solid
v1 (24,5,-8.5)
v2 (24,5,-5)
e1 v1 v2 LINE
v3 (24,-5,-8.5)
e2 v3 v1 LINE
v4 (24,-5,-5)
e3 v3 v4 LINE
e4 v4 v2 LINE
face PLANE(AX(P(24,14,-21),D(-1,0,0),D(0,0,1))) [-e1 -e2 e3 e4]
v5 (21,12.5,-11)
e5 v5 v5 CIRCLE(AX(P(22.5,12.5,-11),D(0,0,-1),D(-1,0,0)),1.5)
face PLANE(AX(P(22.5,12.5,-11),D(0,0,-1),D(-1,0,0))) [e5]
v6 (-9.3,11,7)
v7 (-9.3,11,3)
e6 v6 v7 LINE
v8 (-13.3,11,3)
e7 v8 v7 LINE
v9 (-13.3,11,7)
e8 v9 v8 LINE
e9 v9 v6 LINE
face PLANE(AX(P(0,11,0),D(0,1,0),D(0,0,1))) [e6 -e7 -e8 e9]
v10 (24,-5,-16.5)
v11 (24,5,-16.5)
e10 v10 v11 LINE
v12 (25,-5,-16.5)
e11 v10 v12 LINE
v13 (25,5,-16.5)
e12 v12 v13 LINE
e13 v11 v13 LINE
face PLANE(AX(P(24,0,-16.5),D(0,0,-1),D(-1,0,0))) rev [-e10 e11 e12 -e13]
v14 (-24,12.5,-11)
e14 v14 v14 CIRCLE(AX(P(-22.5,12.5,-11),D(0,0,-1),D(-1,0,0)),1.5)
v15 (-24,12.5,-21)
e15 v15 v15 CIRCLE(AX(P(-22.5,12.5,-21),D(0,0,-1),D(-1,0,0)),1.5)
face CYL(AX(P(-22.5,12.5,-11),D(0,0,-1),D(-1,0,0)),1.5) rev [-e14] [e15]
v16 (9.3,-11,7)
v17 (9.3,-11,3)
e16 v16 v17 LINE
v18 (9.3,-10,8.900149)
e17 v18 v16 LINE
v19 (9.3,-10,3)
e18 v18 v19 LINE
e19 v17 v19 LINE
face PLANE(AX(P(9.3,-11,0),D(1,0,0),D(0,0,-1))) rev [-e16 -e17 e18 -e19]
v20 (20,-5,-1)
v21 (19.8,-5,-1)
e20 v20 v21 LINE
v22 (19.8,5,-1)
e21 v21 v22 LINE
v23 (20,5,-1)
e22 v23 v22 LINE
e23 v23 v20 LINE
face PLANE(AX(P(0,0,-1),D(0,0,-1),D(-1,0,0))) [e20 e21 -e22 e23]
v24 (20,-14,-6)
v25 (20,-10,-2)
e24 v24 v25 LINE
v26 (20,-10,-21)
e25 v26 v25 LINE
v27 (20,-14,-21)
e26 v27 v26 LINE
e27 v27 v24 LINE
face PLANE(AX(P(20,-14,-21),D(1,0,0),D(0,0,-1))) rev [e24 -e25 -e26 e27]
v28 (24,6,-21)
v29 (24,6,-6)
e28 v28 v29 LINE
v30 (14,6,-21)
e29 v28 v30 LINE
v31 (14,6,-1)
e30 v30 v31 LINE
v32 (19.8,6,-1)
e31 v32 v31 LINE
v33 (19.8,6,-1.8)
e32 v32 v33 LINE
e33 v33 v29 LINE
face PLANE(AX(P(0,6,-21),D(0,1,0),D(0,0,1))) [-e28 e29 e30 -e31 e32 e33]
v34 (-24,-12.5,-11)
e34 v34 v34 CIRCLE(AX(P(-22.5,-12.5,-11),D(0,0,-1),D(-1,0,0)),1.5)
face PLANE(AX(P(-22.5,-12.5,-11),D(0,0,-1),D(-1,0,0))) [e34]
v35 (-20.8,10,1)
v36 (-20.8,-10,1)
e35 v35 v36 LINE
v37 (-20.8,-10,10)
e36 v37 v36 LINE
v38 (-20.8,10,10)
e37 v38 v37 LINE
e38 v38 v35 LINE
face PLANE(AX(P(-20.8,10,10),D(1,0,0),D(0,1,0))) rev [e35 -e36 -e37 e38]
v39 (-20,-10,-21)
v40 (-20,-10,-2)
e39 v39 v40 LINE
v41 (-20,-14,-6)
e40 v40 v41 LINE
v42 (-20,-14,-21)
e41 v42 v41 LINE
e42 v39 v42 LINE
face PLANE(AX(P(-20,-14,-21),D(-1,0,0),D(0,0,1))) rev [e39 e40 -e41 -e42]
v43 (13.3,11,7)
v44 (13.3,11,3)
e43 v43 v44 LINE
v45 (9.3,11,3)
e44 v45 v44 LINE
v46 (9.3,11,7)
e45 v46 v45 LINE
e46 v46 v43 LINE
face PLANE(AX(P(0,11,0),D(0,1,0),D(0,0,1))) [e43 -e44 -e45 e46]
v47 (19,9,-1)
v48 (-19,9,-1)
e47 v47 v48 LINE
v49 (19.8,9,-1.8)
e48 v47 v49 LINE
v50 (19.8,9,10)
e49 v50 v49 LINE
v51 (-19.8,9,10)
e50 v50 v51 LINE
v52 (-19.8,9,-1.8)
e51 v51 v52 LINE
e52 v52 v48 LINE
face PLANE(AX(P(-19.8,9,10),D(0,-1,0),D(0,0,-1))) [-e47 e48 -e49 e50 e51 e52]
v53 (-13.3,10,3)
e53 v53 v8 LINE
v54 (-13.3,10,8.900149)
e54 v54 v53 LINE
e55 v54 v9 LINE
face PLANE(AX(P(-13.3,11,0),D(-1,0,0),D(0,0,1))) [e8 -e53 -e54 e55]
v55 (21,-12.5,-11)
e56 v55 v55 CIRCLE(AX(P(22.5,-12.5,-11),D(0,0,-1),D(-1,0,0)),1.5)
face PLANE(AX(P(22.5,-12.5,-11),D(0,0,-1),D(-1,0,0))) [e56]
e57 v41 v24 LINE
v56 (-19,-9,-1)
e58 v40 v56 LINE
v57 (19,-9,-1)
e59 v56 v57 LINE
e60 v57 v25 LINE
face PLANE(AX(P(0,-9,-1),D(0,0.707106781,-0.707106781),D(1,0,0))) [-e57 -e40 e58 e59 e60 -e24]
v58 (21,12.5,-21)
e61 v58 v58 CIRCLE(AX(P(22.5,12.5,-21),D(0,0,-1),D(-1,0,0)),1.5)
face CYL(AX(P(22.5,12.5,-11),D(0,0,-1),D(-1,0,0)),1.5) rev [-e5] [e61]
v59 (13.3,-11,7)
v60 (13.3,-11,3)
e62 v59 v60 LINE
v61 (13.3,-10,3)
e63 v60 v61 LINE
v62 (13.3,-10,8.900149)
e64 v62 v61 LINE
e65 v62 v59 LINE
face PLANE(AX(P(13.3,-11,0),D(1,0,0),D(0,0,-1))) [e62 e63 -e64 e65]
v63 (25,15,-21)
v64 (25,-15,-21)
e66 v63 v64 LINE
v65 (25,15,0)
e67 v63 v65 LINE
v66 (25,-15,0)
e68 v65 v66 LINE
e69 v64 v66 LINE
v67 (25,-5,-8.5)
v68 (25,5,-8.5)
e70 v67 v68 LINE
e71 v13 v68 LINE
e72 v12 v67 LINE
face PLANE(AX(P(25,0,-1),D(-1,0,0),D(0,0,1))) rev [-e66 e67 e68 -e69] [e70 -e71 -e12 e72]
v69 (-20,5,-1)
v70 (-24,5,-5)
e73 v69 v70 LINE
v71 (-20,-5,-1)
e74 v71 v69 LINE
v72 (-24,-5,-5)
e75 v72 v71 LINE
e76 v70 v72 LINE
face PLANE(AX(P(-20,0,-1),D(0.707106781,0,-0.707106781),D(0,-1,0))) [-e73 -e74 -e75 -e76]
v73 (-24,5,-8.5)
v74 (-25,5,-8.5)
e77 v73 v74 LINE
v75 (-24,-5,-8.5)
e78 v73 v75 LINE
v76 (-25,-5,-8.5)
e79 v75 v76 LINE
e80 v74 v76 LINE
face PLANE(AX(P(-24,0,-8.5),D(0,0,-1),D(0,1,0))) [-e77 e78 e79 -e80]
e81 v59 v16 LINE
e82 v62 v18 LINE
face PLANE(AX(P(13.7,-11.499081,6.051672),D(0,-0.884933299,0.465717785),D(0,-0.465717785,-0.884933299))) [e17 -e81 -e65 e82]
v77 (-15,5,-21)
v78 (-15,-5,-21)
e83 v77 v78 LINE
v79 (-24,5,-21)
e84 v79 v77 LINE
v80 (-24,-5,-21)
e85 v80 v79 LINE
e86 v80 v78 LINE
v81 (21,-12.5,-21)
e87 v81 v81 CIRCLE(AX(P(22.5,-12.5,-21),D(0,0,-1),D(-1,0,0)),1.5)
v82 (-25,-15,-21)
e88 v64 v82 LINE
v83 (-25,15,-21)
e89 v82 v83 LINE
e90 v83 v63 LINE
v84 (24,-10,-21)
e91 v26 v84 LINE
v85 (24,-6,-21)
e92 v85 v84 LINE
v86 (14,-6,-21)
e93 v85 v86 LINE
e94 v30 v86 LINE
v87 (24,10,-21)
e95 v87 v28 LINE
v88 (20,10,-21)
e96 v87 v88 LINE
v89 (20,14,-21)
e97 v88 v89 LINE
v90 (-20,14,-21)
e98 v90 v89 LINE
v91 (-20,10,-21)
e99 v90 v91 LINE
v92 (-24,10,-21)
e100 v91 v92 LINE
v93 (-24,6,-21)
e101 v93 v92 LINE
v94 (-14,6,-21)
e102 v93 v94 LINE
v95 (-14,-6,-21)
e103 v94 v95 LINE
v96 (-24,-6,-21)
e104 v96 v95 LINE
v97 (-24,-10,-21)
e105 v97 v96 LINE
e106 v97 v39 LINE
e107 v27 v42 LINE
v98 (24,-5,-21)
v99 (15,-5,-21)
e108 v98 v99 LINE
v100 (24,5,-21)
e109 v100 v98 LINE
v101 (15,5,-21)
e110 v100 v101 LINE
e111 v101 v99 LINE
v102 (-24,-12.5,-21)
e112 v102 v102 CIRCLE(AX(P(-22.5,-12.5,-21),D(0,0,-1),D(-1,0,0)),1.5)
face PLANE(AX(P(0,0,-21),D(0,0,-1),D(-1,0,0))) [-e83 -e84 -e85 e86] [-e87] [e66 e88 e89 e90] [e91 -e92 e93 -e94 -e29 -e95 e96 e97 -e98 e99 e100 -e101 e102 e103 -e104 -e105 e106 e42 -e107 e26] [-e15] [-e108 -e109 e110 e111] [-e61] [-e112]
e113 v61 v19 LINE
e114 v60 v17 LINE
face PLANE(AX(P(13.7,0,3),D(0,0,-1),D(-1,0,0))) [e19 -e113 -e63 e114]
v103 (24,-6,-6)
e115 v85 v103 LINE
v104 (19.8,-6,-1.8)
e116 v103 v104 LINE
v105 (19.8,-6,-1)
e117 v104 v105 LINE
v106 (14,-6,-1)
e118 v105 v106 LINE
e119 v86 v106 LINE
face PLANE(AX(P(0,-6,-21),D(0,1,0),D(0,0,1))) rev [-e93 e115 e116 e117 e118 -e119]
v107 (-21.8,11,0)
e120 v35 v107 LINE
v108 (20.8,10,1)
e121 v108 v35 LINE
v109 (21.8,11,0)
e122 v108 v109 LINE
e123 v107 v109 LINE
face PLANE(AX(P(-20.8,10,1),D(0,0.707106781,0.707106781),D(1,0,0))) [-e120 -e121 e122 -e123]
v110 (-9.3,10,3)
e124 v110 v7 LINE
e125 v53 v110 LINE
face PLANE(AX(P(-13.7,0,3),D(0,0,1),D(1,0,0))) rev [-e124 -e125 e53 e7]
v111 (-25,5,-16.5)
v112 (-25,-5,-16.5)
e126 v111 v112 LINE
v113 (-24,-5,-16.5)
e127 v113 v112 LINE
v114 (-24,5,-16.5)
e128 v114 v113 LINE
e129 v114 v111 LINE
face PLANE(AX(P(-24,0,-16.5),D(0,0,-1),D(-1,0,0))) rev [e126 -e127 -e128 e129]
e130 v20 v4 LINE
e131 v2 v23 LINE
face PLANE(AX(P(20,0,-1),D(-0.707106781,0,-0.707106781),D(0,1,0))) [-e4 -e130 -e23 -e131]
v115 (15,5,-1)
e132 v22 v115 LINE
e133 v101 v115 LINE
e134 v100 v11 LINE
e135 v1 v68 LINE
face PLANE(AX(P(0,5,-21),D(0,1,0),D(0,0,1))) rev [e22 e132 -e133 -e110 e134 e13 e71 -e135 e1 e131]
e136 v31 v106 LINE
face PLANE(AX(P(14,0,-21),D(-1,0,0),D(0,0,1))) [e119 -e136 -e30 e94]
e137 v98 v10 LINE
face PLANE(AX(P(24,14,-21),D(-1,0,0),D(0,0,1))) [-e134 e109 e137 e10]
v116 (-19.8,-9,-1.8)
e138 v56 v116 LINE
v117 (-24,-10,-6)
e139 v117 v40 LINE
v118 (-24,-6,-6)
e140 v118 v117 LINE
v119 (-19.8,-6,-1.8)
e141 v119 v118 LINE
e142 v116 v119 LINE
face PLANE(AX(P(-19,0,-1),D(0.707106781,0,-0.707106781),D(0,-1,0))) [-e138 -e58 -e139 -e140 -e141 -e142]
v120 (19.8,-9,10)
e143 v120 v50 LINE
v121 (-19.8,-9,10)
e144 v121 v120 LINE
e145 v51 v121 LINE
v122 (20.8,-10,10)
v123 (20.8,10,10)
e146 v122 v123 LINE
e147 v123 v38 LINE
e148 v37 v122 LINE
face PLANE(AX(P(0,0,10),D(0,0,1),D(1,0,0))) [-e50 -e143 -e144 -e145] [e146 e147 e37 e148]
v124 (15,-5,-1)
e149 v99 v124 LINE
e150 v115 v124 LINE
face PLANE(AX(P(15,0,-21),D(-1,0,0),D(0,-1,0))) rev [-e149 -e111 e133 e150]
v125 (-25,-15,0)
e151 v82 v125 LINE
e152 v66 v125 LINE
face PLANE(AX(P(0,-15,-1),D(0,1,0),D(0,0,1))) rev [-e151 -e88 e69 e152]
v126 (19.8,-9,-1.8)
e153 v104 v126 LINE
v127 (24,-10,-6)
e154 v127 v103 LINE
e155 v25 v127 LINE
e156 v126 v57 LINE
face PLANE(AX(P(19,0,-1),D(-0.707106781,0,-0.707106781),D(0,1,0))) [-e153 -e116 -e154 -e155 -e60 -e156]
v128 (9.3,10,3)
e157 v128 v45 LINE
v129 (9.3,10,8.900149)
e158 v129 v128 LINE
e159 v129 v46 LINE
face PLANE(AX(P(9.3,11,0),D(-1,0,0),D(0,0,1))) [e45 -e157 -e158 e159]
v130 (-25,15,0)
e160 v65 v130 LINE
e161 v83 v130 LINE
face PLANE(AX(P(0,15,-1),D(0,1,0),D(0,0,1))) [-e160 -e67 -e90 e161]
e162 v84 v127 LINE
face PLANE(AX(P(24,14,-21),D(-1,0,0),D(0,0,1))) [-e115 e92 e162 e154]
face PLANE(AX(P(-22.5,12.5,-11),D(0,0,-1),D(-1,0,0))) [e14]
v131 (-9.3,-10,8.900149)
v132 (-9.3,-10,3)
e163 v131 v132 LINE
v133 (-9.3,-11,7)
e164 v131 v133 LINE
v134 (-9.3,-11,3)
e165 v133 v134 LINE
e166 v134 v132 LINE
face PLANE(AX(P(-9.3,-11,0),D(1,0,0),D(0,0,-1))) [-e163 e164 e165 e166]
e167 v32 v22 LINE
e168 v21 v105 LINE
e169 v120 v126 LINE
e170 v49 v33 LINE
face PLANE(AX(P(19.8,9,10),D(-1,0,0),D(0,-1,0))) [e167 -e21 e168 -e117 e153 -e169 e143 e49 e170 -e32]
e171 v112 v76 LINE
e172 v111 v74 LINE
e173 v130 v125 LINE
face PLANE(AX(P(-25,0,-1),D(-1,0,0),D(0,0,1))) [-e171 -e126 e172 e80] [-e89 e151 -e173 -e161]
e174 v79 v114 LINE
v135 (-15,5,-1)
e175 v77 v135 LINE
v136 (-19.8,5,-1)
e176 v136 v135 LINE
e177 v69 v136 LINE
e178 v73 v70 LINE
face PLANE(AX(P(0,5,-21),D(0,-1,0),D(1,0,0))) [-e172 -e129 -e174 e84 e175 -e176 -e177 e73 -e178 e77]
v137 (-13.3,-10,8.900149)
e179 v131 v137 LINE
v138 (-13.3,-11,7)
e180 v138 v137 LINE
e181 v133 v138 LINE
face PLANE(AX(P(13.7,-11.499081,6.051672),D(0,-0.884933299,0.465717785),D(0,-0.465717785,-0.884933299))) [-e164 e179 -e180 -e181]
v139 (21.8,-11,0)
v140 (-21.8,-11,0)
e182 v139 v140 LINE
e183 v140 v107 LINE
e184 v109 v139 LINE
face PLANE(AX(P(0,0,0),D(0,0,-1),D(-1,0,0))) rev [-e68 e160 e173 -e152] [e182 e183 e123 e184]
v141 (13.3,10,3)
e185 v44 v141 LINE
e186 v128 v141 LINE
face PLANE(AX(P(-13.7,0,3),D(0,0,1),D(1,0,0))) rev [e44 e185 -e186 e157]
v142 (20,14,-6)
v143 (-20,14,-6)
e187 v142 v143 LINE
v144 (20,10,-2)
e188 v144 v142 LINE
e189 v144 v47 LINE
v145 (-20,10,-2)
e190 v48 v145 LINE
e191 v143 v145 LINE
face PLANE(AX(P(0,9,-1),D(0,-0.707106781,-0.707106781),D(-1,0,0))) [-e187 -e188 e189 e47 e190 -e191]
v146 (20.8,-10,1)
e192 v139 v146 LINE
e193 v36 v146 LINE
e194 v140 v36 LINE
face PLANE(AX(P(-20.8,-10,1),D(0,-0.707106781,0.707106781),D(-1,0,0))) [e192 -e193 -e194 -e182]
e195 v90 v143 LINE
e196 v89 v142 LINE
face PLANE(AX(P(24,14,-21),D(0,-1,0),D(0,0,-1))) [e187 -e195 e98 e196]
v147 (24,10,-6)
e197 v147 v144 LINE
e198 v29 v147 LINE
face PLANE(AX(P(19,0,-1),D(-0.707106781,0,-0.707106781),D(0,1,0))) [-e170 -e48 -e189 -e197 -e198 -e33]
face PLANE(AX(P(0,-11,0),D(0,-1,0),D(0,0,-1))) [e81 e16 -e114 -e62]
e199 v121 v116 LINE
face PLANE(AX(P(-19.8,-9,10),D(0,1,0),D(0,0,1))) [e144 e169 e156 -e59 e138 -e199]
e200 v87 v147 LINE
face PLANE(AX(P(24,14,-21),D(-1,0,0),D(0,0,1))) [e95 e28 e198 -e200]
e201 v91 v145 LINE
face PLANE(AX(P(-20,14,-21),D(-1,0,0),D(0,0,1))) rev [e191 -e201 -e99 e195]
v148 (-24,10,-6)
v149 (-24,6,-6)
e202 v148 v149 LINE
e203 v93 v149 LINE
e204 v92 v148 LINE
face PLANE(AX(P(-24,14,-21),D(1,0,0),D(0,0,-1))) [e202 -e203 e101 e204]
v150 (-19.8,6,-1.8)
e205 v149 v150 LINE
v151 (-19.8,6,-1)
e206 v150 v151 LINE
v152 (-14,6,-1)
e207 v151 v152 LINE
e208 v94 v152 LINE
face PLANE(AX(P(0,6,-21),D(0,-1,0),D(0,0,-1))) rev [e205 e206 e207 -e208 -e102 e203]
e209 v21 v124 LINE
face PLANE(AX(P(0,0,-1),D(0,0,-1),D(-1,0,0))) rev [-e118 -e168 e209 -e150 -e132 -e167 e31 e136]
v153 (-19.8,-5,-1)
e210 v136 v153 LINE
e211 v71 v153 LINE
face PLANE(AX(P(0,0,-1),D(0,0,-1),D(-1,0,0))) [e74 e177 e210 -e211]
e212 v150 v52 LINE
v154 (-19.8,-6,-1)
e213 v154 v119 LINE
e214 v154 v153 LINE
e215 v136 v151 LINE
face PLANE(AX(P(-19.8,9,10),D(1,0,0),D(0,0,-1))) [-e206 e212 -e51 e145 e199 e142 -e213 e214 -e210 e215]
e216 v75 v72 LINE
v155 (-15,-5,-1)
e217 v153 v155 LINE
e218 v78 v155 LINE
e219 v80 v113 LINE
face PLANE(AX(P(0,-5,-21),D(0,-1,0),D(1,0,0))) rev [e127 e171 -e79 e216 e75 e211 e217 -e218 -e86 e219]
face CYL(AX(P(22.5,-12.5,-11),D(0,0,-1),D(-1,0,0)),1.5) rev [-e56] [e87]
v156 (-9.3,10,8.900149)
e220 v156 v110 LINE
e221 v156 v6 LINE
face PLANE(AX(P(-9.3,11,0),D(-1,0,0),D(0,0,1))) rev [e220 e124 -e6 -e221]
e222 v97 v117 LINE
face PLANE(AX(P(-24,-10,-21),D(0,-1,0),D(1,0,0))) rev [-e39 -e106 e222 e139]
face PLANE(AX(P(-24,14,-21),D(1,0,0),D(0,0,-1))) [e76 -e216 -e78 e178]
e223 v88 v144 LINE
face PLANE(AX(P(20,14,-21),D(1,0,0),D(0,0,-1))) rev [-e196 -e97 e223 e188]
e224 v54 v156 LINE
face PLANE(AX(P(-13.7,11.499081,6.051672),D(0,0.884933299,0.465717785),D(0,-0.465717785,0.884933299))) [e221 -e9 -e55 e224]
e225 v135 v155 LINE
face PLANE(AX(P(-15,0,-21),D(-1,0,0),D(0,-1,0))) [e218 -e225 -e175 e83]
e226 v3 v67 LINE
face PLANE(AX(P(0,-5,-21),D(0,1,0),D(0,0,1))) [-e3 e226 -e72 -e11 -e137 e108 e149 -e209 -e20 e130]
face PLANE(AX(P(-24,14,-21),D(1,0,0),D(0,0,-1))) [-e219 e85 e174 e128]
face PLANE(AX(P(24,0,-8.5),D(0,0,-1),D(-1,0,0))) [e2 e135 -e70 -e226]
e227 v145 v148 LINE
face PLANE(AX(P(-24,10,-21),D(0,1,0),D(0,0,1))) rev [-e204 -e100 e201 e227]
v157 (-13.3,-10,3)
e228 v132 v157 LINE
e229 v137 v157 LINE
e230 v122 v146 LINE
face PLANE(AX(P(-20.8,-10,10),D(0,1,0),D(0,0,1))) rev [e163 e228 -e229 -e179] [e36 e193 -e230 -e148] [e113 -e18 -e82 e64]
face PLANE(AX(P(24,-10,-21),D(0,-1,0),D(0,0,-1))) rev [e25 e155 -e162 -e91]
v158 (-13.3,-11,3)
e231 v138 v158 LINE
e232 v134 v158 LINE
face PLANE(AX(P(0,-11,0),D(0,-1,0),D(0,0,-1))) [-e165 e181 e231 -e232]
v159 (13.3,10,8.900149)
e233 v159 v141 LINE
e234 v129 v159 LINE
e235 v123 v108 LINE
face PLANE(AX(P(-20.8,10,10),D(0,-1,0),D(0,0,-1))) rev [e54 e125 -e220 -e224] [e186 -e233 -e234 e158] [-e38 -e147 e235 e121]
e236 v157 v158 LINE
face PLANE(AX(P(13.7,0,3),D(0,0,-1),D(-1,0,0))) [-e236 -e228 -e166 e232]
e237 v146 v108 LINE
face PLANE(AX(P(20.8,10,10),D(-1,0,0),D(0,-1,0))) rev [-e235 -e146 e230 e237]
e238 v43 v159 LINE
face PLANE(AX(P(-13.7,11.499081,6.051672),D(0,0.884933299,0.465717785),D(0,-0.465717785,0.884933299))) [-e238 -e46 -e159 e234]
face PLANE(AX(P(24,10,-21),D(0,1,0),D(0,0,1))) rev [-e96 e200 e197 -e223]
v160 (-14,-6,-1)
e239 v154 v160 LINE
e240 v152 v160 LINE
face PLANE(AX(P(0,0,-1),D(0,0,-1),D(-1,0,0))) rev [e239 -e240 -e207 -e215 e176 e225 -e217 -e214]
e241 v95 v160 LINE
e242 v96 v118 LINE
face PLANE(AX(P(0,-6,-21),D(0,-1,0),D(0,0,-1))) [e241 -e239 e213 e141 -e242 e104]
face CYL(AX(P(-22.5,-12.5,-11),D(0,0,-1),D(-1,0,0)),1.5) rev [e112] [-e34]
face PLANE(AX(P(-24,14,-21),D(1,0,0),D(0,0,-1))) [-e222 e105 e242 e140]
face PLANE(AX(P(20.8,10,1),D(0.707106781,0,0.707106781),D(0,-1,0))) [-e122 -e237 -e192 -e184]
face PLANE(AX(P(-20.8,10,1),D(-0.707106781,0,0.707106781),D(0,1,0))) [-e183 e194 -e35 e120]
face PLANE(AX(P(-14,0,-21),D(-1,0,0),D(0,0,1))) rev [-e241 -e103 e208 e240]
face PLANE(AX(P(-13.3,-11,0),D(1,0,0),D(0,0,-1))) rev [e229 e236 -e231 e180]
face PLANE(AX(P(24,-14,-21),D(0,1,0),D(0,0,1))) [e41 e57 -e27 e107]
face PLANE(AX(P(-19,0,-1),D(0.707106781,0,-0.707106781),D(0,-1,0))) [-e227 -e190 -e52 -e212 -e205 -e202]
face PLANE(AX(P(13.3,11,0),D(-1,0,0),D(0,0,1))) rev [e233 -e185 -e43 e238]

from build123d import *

# Parameters (mm, degrees)
SKETCH1_W            = 41.6
SKETCH1_H            = 20
SKETCH1_W_2          = 39.6
SKETCH1_H_2          = 18
BOSS_EXTRUDE2_DEPTH  = 10
SKETCH2_W            = 4
SKETCH2_H            = 10
BOSS_EXTRUDE3_DEPTH  = 1
SKETCH3_W            = 3
SKETCH3_H            = 1
CUT_EXTRUDE1_DEPTH   = 27
SKETCH4_W            = 4
SKETCH4_H            = 10
BOSS_EXTRUDE4_DEPTH  = 1
SKETCH5_W            = 3
SKETCH5_H            = 1
CUT_EXTRUDE2_DEPTH   = 27
SKETCH6_W            = 50
SKETCH6_H            = 30
SKETCH6_W_2          = 41.6
SKETCH6_H_2          = 20
SKETCH6_W_3          = 39.6
SKETCH6_H_3          = 18
BOSS_EXTRUDE6_DEPTH  = 1
CHAMFER1_SIZE        = 1
SKETCH7_W            = 50
SKETCH7_H            = 30
SKETCH7_W_2          = 48
SKETCH7_H_2          = 28
BOSS_EXTRUDE7_DEPTH  = 20
SKETCH8_W            = 4.2
SKETCH8_H            = 1
BOSS_EXTRUDE8_DEPTH  = 20
SKETCH9_W            = 4.2
SKETCH9_H            = 1
BOSS_EXTRUDE9_DEPTH  = 20
SKETCH10_W           = 4
SKETCH10_H           = 4
BOSS_EXTRUDE10_DEPTH = 20
SKETCH11_W           = 2
SKETCH11_H           = 10
CUT_EXTRUDE3_DEPTH   = 1
SKETCH12_W           = 2
SKETCH12_H           = 10
CUT_EXTRUDE4_DEPTH   = 1
SKETCH13_R           = 1.5
CUT_EXTRUDE5_DEPTH   = 10
CHAMFER2_SIZE        = 5
CHAMFER3_SIZE        = 5
CHAMFER4_SIZE        = 4


# Some blends are built 0.0001 mm under size
with BuildPart() as part:
    # Sketch1 → Boss-Extrude2 (new body)
    with BuildSketch(Plane.XY):
        Rectangle(SKETCH1_W, SKETCH1_H)
        Rectangle(SKETCH1_W_2, SKETCH1_H_2, mode=Mode.SUBTRACT)
    extrude(amount=BOSS_EXTRUDE2_DEPTH)

    # Sketch2 → Boss-Extrude3 (add)
    with BuildSketch(Plane.XZ.offset(10)):
        with Locations((-11.3, 5)):
            Rectangle(SKETCH2_W, SKETCH2_H)
        with Locations((11.3, 5)):
            Rectangle(SKETCH2_W, SKETCH2_H)
    extrude(amount=BOSS_EXTRUDE3_DEPTH)

    # Sketch3 → Cut-Extrude1 (cut)
    with BuildSketch(Plane.ZY.offset(13.3)):
        Polygon((8.900149248, -10), (7, -11), (10, -11), (10, -10), align=None)
        with Locations((1.5, -10.5)):
            Rectangle(SKETCH3_W, SKETCH3_H)
    extrude(amount=-CUT_EXTRUDE1_DEPTH, mode=Mode.SUBTRACT)

    # Sketch4 → Boss-Extrude4 (add)
    with BuildSketch(Plane(origin=(0, 10, 0), x_dir=(1, 0, 0), z_dir=(0, 1, 0))):
        with Locations((11.3, -5)):
            Rectangle(SKETCH4_W, SKETCH4_H)
        with Locations((-11.3, -5)):
            Rectangle(SKETCH4_W, SKETCH4_H)
    extrude(amount=BOSS_EXTRUDE4_DEPTH)

    # Sketch5 → Cut-Extrude2 (cut)
    with BuildSketch(Plane(origin=(13.3, 0, 0), x_dir=(0, 0, -1), z_dir=(1, 0, 0))):
        Polygon((-7, 11), (-10, 11), (-10, 10), (-8.900149248, 10), align=None)
        with Locations((-1.5, 10.5)):
            Rectangle(SKETCH5_W, SKETCH5_H)
    extrude(amount=-CUT_EXTRUDE2_DEPTH, mode=Mode.SUBTRACT)

    # Sketch6 → Boss-Extrude6 (add)
    # profile 1 of 2: a face of its own
    with BuildSketch(Plane(origin=(0, 0, 0), x_dir=(-1, 0, 0), z_dir=(0, 0, -1))):
        Rectangle(SKETCH6_W, SKETCH6_H)
        Rectangle(SKETCH6_W_2, SKETCH6_H_2, mode=Mode.SUBTRACT)
    # profile 2 of 2: a face of its own
    with BuildSketch(Plane(origin=(0, 0, 0), x_dir=(-1, 0, 0), z_dir=(0, 0, -1))):
        Rectangle(SKETCH6_W_2, SKETCH6_H_2)
        Rectangle(SKETCH6_W_3, SKETCH6_H_3, mode=Mode.SUBTRACT)
    extrude(amount=BOSS_EXTRUDE6_DEPTH)

    # Chamfer1
    chamfer1_edges = [part.edges().sort_by_distance(p)[0] for p in [
        (0, -10, 0),
        (-20.8, 0, 0),
        (0, 10, 0),
        (20.8, 0, 0),
    ]]
    chamfer(chamfer1_edges, length=CHAMFER1_SIZE)

    # Sketch7 → Boss-Extrude7 (add)
    with BuildSketch(Plane(origin=(0, 0, -1), x_dir=(-1, 0, 0), z_dir=(0, 0, -1))):
        Rectangle(SKETCH7_W, SKETCH7_H)
        Rectangle(SKETCH7_W_2, SKETCH7_H_2, mode=Mode.SUBTRACT)
    extrude(amount=BOSS_EXTRUDE7_DEPTH)

    # Sketch8 → Boss-Extrude8 (add)
    with BuildSketch(Plane(origin=(0, 0, -1), x_dir=(-1, 0, 0), z_dir=(0, 0, -1))):
        Polygon((-15, -5), (-19.8, -5), (-19.8, -6), (-14, -6), (-14, 6), (-19.8, 6), (-19.8, 5), (-15, 5), align=None)
        with Locations((-21.9, 5.5)):
            Rectangle(SKETCH8_W, SKETCH8_H)
        with Locations((-21.9, -5.5)):
            Rectangle(SKETCH8_W, SKETCH8_H)
    extrude(amount=BOSS_EXTRUDE8_DEPTH)

    # Sketch9 → Boss-Extrude9 (add)
    with BuildSketch(Plane(origin=(0, 0, -1), x_dir=(-1, 0, 0), z_dir=(0, 0, -1))):
        Polygon((15, 5), (19.8, 5), (19.8, 6), (14, 6), (14, -6), (19.8, -6), (19.8, -5), (15, -5), align=None)
        with Locations((21.9, 5.5)):
            Rectangle(SKETCH9_W, SKETCH9_H)
        with Locations((21.9, -5.5)):
            Rectangle(SKETCH9_W, SKETCH9_H)
    extrude(amount=BOSS_EXTRUDE9_DEPTH)

    # Sketch10 → Boss-Extrude10 (add)
    with BuildSketch(Plane(origin=(0, 0, -1), x_dir=(-1, 0, 0), z_dir=(0, 0, -1))):
        with Locations((-22, 12)):
            Rectangle(SKETCH10_W, SKETCH10_H)
        with Locations((22, 12)):
            Rectangle(SKETCH10_W, SKETCH10_H)
        with Locations((22, -12)):
            Rectangle(SKETCH10_W, SKETCH10_H)
        with Locations((-22, -12)):
            Rectangle(SKETCH10_W, SKETCH10_H)
    extrude(amount=BOSS_EXTRUDE10_DEPTH)

    # Sketch11 → Cut-Extrude3 (cut)
    with BuildSketch(Plane.ZY.offset(25)):
        Polygon((-10.5, -5), (-10.5, 5), (-16.5, 5), (-16.5, 0), (-16.5, -5), align=None)
        with Locations((-9.5, 0)):
            Rectangle(SKETCH11_W, SKETCH11_H)
    extrude(amount=-CUT_EXTRUDE3_DEPTH, mode=Mode.SUBTRACT)

    # Sketch12 → Cut-Extrude4 (cut)
    with BuildSketch(Plane(origin=(25, 0, 0), x_dir=(0, 0, -1), z_dir=(1, 0, 0))):
        with Locations((9.5, 0)):
            Rectangle(SKETCH12_W, SKETCH12_H)
        Polygon((16.5, 5), (10.5, 5), (10.5, -5), (16.5, -5), (16.5, 0), align=None)
    extrude(amount=-CUT_EXTRUDE4_DEPTH, mode=Mode.SUBTRACT)

    # Sketch13 → Cut-Extrude5 (cut)
    with BuildSketch(Plane(origin=(0, 0, -21), x_dir=(-1, 0, 0), z_dir=(0, 0, -1))):
        with Locations((-22.5, 12.5)):
            Circle(SKETCH13_R)
        with Locations((22.5, 12.5)):
            Circle(SKETCH13_R)
        with Locations((22.5, -12.5)):
            Circle(SKETCH13_R)
        with Locations((-22.5, -12.5)):
            Circle(SKETCH13_R)
    extrude(amount=-CUT_EXTRUDE5_DEPTH, mode=Mode.SUBTRACT)

    # Chamfer2
    chamfer2_edges = [part.edges().sort_by_distance(p)[0] for p in [
        (0, 14, -1),
        (0, -14, -1),
    ]]
    chamfer(chamfer2_edges, length=CHAMFER2_SIZE - 0.0001)  # a hair under: the kernel refuses the full size

    # Chamfer3
    # the kernel refuses this chamfer: 5 mm, written as the material it adds along each edge
    with BuildSketch(Plane(origin=(24, -21.85851494, -1), x_dir=(-0.9996219169112968, 0, 0.02749587661058636), z_dir=(0, 1, 0))) as chamfer3_piece_1_section:
        Polygon((CHAMFER3_SIZE * 0.999621916911, -CHAMFER3_SIZE * 0.0274958766106), (-CHAMFER3_SIZE * 0.0274958766106, -CHAMFER3_SIZE * 0.999621916911), (0, 0), align=None)
    chamfer3_piece_1 = extrude(amount=28.71692988, mode=Mode.PRIVATE)
    chamfer3_piece_1 = split(chamfer3_piece_1, bisect_by=Plane(origin=(19.8, -10.000025, -1.99995), z_dir=(1, 0, 0)), keep=Keep.TOP, mode=Mode.PRIVATE)
    chamfer3_piece_1 = split(chamfer3_piece_1, bisect_by=Plane(origin=(19.999975, -5, -1.99995), z_dir=(0, -1, 0)), keep=Keep.TOP, mode=Mode.PRIVATE)
    chamfer3_piece_1 = split(chamfer3_piece_1, bisect_by=Plane(origin=(19.999975, -10.0000375, -1.9999375), z_dir=(0, 0.7071067811865476, -0.7071067811865476)), keep=Keep.TOP, mode=Mode.PRIVATE)
    add(chamfer3_piece_1)
    with BuildSketch(Plane(origin=(24, -21.85851494, -1), x_dir=(-0.9996219169112968, 0, 0.02749587661058636), z_dir=(0, 1, 0))) as chamfer3_piece_2_section:
        Polygon((CHAMFER3_SIZE * 0.999621916911, -CHAMFER3_SIZE * 0.0274958766106), (-CHAMFER3_SIZE * 0.0274958766106, -CHAMFER3_SIZE * 0.999621916911), (0, 0), align=None)
    chamfer3_piece_2 = extrude(amount=28.71692988, mode=Mode.PRIVATE)
    chamfer3_piece_2 = split(chamfer3_piece_2, bisect_by=Plane(origin=(19.599975009, -9, -1.399950019), z_dir=(0, -1, 0)), keep=Keep.TOP, mode=Mode.PRIVATE)
    chamfer3_piece_2 = split(chamfer3_piece_2, bisect_by=Plane(origin=(19.599975009, -9.300037514, -1.299937514), z_dir=(0, 0.7071067811865476, -0.7071067811865476)), keep=Keep.TOP, mode=Mode.PRIVATE)
    add(chamfer3_piece_2)
    with BuildSketch(Plane(origin=(24, -21.85851494, -1), x_dir=(-0.9996219169112968, 0, 0.02749587661058636), z_dir=(0, 1, 0))) as chamfer3_piece_3_section:
        Polygon((CHAMFER3_SIZE * 0.999621916911, -CHAMFER3_SIZE * 0.0274958766106), (-CHAMFER3_SIZE * 0.0274958766106, -CHAMFER3_SIZE * 0.999621916911), (0, 0), align=None)
    chamfer3_piece_3 = extrude(amount=28.71692988, mode=Mode.PRIVATE)
    chamfer3_piece_3 = split(chamfer3_piece_3, bisect_by=Plane(origin=(19.8, 6.42920747, -1.451851852), z_dir=(1, 0, 0)), keep=Keep.TOP, mode=Mode.PRIVATE)
    chamfer3_piece_3 = split(chamfer3_piece_3, bisect_by=Plane(origin=(19.903703704, 5, -1.451851852), z_dir=(0, 1, 0)), keep=Keep.TOP, mode=Mode.PRIVATE)
    add(chamfer3_piece_3)
    with BuildSketch(Plane(origin=(-24, 21.85851494, -1), x_dir=(0.9996219169112968, 0, 0.02749587661058636), z_dir=(0, -1, 0))) as chamfer3_piece_4_section:
        Polygon((CHAMFER3_SIZE * 0.999621916911, -CHAMFER3_SIZE * 0.0274958766106), (-CHAMFER3_SIZE * 0.0274958766106, -CHAMFER3_SIZE * 0.999621916911), (0, 0), align=None)
    chamfer3_piece_4 = extrude(amount=28.71692988, mode=Mode.PRIVATE)
    chamfer3_piece_4 = split(chamfer3_piece_4, bisect_by=Plane(origin=(-19.8, 10.000025, -1.99995), z_dir=(-1, 0, 0)), keep=Keep.TOP, mode=Mode.PRIVATE)
    chamfer3_piece_4 = split(chamfer3_piece_4, bisect_by=Plane(origin=(-19.999975, 15, -1.99995), z_dir=(0, -1, 0)), keep=Keep.TOP, mode=Mode.PRIVATE)
    chamfer3_piece_4 = split(chamfer3_piece_4, bisect_by=Plane(origin=(-19.999975, 5, -1.99995), z_dir=(0, 1, 0)), keep=Keep.TOP, mode=Mode.PRIVATE)
    add(chamfer3_piece_4)
    with BuildSketch(Plane(origin=(-24, 21.85851494, -1), x_dir=(0.9996219169112968, 0, 0.02749587661058636), z_dir=(0, -1, 0))) as chamfer3_piece_5_section:
        Polygon((CHAMFER3_SIZE * 0.999621916911, -CHAMFER3_SIZE * 0.0274958766106), (-CHAMFER3_SIZE * 0.0274958766106, -CHAMFER3_SIZE * 0.999621916911), (0, 0), align=None)
    chamfer3_piece_5 = extrude(amount=28.71692988, mode=Mode.PRIVATE)
    chamfer3_piece_5 = split(chamfer3_piece_5, bisect_by=Plane(origin=(-19.599975009, 9, -1.399950019), z_dir=(0, 1, 0)), keep=Keep.TOP, mode=Mode.PRIVATE)
    chamfer3_piece_5 = split(chamfer3_piece_5, bisect_by=Plane(origin=(-19.599975009, 15, -1.399950019), z_dir=(0, -1, 0)), keep=Keep.TOP, mode=Mode.PRIVATE)
    add(chamfer3_piece_5)
    with BuildSketch(Plane(origin=(-24, 21.85851494, -1), x_dir=(0.9996219169112968, 0, 0.02749587661058636), z_dir=(0, -1, 0))) as chamfer3_piece_6_section:
        Polygon((CHAMFER3_SIZE * 0.999621916911, -CHAMFER3_SIZE * 0.0274958766106), (-CHAMFER3_SIZE * 0.0274958766106, -CHAMFER3_SIZE * 0.999621916911), (0, 0), align=None)
    chamfer3_piece_6 = extrude(amount=28.71692988, mode=Mode.PRIVATE)
    chamfer3_piece_6 = split(chamfer3_piece_6, bisect_by=Plane(origin=(-19.8, -6.42920747, -1.451851852), z_dir=(-1, 0, 0)), keep=Keep.TOP, mode=Mode.PRIVATE)
    chamfer3_piece_6 = split(chamfer3_piece_6, bisect_by=Plane(origin=(-19.903703704, -6, -1.451851852), z_dir=(0, -1, 0)), keep=Keep.TOP, mode=Mode.PRIVATE)
    add(chamfer3_piece_6)
    with BuildSketch(Plane(origin=(-24, 6.85841494, -1), x_dir=(0.9996219169112968, 0, 0.02749587661058636), z_dir=(0, -1, 0))) as chamfer3_piece_7_section:
        Polygon((CHAMFER3_SIZE * 0.999621916911, -CHAMFER3_SIZE * 0.0274958766106), (-CHAMFER3_SIZE * 0.0274958766106, -CHAMFER3_SIZE * 0.999621916911), (0, 0), align=None)
    chamfer3_piece_7 = extrude(amount=28.71692988, mode=Mode.PRIVATE)
    chamfer3_piece_7 = split(chamfer3_piece_7, bisect_by=Plane(origin=(-19.8, 6.42920747, -1.451851852), z_dir=(-1, 0, 0)), keep=Keep.TOP, mode=Mode.PRIVATE)
    chamfer3_piece_7 = split(chamfer3_piece_7, bisect_by=Plane(origin=(-19.903703704, 5, -1.451851852), z_dir=(0, 1, 0)), keep=Keep.TOP, mode=Mode.PRIVATE)
    add(chamfer3_piece_7)
    with BuildSketch(Plane(origin=(-24, -6, -1), x_dir=(0.9996219169112968, 0, 0.02749587661058636), z_dir=(0, -1, 0))) as chamfer3_piece_8_section:
        Polygon((CHAMFER3_SIZE * 0.999621916911, -CHAMFER3_SIZE * 0.0274958766106), (-CHAMFER3_SIZE * 0.0274958766106, -CHAMFER3_SIZE * 0.999621916911), (0, 0), align=None)
    chamfer3_piece_8 = extrude(amount=15.85851494, mode=Mode.PRIVATE)
    chamfer3_piece_8 = split(chamfer3_piece_8, bisect_by=Plane(origin=(-19.8, -7.5, -1.451851852), z_dir=(-1, 0, 0)), keep=Keep.TOP, mode=Mode.PRIVATE)
    chamfer3_piece_8 = split(chamfer3_piece_8, bisect_by=Plane(origin=(-19.903703704, -8.475975926, -0.475875926), z_dir=(0, 0.7071067811865476, -0.7071067811865476)), keep=Keep.TOP, mode=Mode.PRIVATE)
    add(chamfer3_piece_8)
    with BuildSketch(Plane(origin=(-24, 6.85841494, -1), x_dir=(0.9996219169112968, 0, 0.02749587661058636), z_dir=(0, -1, 0))) as chamfer3_piece_9_section:
        Polygon((CHAMFER3_SIZE * 0.999621916911, -CHAMFER3_SIZE * 0.0274958766106), (-CHAMFER3_SIZE * 0.0274958766106, -CHAMFER3_SIZE * 0.999621916911), (0, 0), align=None)
    chamfer3_piece_9 = extrude(amount=28.71692988, mode=Mode.PRIVATE)
    chamfer3_piece_9 = split(chamfer3_piece_9, bisect_by=Plane(origin=(-19.599975009, -9, -1.399950019), z_dir=(0, -1, 0)), keep=Keep.TOP, mode=Mode.PRIVATE)
    chamfer3_piece_9 = split(chamfer3_piece_9, bisect_by=Plane(origin=(-19.599975009, -9.300037514, -1.299937514), z_dir=(0, 0.7071067811865476, -0.7071067811865476)), keep=Keep.TOP, mode=Mode.PRIVATE)
    add(chamfer3_piece_9)
    with BuildSketch(Plane(origin=(24, -6.85841494, -1), x_dir=(-0.9996219169112968, 0, 0.02749587661058636), z_dir=(0, 1, 0))) as chamfer3_piece_10_section:
        Polygon((CHAMFER3_SIZE * 0.999621916911, -CHAMFER3_SIZE * 0.0274958766106), (-CHAMFER3_SIZE * 0.0274958766106, -CHAMFER3_SIZE * 0.999621916911), (0, 0), align=None)
    chamfer3_piece_10 = extrude(amount=28.71692988, mode=Mode.PRIVATE)
    chamfer3_piece_10 = split(chamfer3_piece_10, bisect_by=Plane(origin=(19.8, -6.42920747, -1.451851852), z_dir=(1, 0, 0)), keep=Keep.TOP, mode=Mode.PRIVATE)
    chamfer3_piece_10 = split(chamfer3_piece_10, bisect_by=Plane(origin=(19.903703704, -5, -1.451851852), z_dir=(0, -1, 0)), keep=Keep.TOP, mode=Mode.PRIVATE)
    add(chamfer3_piece_10)
    with BuildSketch(Plane(origin=(24, -6.85841494, -1), x_dir=(-0.9996219169112968, 0, 0.02749587661058636), z_dir=(0, 1, 0))) as chamfer3_piece_11_section:
        Polygon((CHAMFER3_SIZE * 0.999621916911, -CHAMFER3_SIZE * 0.0274958766106), (-CHAMFER3_SIZE * 0.0274958766106, -CHAMFER3_SIZE * 0.999621916911), (0, 0), align=None)
    chamfer3_piece_11 = extrude(amount=28.71692988, mode=Mode.PRIVATE)
    chamfer3_piece_11 = split(chamfer3_piece_11, bisect_by=Plane(origin=(19.8, 7.5, -1.451851852), z_dir=(1, 0, 0)), keep=Keep.TOP, mode=Mode.PRIVATE)
    chamfer3_piece_11 = split(chamfer3_piece_11, bisect_by=Plane(origin=(19.903703704, 15, -1.451851852), z_dir=(0, -1, 0)), keep=Keep.TOP, mode=Mode.PRIVATE)
    chamfer3_piece_11 = split(chamfer3_piece_11, bisect_by=Plane(origin=(19.903703704, 5, -1.451851852), z_dir=(0, 1, 0)), keep=Keep.TOP, mode=Mode.PRIVATE)
    add(chamfer3_piece_11)
    with BuildSketch(Plane(origin=(24, -6.85841494, -1), x_dir=(-0.9996219169112968, 0, 0.02749587661058636), z_dir=(0, 1, 0))) as chamfer3_piece_12_section:
        Polygon((CHAMFER3_SIZE * 0.999621916911, -CHAMFER3_SIZE * 0.0274958766106), (-CHAMFER3_SIZE * 0.0274958766106, -CHAMFER3_SIZE * 0.999621916911), (0, 0), align=None)
    chamfer3_piece_12 = extrude(amount=28.71692988, mode=Mode.PRIVATE)
    chamfer3_piece_12 = split(chamfer3_piece_12, bisect_by=Plane(origin=(19.599975009, 9, -1.399950019), z_dir=(0, 1, 0)), keep=Keep.TOP, mode=Mode.PRIVATE)
    chamfer3_piece_12 = split(chamfer3_piece_12, bisect_by=Plane(origin=(19.599975009, 15, -1.399950019), z_dir=(0, -1, 0)), keep=Keep.TOP, mode=Mode.PRIVATE)
    add(chamfer3_piece_12)

    # Chamfer4
    chamfer4_edges = [part.edges().sort_by_distance(p)[0] for p in [
        (24, 0, -1),
        (-24, 0, -1),
    ]]
    chamfer(chamfer4_edges, length=CHAMFER4_SIZE)


solid = part.part
